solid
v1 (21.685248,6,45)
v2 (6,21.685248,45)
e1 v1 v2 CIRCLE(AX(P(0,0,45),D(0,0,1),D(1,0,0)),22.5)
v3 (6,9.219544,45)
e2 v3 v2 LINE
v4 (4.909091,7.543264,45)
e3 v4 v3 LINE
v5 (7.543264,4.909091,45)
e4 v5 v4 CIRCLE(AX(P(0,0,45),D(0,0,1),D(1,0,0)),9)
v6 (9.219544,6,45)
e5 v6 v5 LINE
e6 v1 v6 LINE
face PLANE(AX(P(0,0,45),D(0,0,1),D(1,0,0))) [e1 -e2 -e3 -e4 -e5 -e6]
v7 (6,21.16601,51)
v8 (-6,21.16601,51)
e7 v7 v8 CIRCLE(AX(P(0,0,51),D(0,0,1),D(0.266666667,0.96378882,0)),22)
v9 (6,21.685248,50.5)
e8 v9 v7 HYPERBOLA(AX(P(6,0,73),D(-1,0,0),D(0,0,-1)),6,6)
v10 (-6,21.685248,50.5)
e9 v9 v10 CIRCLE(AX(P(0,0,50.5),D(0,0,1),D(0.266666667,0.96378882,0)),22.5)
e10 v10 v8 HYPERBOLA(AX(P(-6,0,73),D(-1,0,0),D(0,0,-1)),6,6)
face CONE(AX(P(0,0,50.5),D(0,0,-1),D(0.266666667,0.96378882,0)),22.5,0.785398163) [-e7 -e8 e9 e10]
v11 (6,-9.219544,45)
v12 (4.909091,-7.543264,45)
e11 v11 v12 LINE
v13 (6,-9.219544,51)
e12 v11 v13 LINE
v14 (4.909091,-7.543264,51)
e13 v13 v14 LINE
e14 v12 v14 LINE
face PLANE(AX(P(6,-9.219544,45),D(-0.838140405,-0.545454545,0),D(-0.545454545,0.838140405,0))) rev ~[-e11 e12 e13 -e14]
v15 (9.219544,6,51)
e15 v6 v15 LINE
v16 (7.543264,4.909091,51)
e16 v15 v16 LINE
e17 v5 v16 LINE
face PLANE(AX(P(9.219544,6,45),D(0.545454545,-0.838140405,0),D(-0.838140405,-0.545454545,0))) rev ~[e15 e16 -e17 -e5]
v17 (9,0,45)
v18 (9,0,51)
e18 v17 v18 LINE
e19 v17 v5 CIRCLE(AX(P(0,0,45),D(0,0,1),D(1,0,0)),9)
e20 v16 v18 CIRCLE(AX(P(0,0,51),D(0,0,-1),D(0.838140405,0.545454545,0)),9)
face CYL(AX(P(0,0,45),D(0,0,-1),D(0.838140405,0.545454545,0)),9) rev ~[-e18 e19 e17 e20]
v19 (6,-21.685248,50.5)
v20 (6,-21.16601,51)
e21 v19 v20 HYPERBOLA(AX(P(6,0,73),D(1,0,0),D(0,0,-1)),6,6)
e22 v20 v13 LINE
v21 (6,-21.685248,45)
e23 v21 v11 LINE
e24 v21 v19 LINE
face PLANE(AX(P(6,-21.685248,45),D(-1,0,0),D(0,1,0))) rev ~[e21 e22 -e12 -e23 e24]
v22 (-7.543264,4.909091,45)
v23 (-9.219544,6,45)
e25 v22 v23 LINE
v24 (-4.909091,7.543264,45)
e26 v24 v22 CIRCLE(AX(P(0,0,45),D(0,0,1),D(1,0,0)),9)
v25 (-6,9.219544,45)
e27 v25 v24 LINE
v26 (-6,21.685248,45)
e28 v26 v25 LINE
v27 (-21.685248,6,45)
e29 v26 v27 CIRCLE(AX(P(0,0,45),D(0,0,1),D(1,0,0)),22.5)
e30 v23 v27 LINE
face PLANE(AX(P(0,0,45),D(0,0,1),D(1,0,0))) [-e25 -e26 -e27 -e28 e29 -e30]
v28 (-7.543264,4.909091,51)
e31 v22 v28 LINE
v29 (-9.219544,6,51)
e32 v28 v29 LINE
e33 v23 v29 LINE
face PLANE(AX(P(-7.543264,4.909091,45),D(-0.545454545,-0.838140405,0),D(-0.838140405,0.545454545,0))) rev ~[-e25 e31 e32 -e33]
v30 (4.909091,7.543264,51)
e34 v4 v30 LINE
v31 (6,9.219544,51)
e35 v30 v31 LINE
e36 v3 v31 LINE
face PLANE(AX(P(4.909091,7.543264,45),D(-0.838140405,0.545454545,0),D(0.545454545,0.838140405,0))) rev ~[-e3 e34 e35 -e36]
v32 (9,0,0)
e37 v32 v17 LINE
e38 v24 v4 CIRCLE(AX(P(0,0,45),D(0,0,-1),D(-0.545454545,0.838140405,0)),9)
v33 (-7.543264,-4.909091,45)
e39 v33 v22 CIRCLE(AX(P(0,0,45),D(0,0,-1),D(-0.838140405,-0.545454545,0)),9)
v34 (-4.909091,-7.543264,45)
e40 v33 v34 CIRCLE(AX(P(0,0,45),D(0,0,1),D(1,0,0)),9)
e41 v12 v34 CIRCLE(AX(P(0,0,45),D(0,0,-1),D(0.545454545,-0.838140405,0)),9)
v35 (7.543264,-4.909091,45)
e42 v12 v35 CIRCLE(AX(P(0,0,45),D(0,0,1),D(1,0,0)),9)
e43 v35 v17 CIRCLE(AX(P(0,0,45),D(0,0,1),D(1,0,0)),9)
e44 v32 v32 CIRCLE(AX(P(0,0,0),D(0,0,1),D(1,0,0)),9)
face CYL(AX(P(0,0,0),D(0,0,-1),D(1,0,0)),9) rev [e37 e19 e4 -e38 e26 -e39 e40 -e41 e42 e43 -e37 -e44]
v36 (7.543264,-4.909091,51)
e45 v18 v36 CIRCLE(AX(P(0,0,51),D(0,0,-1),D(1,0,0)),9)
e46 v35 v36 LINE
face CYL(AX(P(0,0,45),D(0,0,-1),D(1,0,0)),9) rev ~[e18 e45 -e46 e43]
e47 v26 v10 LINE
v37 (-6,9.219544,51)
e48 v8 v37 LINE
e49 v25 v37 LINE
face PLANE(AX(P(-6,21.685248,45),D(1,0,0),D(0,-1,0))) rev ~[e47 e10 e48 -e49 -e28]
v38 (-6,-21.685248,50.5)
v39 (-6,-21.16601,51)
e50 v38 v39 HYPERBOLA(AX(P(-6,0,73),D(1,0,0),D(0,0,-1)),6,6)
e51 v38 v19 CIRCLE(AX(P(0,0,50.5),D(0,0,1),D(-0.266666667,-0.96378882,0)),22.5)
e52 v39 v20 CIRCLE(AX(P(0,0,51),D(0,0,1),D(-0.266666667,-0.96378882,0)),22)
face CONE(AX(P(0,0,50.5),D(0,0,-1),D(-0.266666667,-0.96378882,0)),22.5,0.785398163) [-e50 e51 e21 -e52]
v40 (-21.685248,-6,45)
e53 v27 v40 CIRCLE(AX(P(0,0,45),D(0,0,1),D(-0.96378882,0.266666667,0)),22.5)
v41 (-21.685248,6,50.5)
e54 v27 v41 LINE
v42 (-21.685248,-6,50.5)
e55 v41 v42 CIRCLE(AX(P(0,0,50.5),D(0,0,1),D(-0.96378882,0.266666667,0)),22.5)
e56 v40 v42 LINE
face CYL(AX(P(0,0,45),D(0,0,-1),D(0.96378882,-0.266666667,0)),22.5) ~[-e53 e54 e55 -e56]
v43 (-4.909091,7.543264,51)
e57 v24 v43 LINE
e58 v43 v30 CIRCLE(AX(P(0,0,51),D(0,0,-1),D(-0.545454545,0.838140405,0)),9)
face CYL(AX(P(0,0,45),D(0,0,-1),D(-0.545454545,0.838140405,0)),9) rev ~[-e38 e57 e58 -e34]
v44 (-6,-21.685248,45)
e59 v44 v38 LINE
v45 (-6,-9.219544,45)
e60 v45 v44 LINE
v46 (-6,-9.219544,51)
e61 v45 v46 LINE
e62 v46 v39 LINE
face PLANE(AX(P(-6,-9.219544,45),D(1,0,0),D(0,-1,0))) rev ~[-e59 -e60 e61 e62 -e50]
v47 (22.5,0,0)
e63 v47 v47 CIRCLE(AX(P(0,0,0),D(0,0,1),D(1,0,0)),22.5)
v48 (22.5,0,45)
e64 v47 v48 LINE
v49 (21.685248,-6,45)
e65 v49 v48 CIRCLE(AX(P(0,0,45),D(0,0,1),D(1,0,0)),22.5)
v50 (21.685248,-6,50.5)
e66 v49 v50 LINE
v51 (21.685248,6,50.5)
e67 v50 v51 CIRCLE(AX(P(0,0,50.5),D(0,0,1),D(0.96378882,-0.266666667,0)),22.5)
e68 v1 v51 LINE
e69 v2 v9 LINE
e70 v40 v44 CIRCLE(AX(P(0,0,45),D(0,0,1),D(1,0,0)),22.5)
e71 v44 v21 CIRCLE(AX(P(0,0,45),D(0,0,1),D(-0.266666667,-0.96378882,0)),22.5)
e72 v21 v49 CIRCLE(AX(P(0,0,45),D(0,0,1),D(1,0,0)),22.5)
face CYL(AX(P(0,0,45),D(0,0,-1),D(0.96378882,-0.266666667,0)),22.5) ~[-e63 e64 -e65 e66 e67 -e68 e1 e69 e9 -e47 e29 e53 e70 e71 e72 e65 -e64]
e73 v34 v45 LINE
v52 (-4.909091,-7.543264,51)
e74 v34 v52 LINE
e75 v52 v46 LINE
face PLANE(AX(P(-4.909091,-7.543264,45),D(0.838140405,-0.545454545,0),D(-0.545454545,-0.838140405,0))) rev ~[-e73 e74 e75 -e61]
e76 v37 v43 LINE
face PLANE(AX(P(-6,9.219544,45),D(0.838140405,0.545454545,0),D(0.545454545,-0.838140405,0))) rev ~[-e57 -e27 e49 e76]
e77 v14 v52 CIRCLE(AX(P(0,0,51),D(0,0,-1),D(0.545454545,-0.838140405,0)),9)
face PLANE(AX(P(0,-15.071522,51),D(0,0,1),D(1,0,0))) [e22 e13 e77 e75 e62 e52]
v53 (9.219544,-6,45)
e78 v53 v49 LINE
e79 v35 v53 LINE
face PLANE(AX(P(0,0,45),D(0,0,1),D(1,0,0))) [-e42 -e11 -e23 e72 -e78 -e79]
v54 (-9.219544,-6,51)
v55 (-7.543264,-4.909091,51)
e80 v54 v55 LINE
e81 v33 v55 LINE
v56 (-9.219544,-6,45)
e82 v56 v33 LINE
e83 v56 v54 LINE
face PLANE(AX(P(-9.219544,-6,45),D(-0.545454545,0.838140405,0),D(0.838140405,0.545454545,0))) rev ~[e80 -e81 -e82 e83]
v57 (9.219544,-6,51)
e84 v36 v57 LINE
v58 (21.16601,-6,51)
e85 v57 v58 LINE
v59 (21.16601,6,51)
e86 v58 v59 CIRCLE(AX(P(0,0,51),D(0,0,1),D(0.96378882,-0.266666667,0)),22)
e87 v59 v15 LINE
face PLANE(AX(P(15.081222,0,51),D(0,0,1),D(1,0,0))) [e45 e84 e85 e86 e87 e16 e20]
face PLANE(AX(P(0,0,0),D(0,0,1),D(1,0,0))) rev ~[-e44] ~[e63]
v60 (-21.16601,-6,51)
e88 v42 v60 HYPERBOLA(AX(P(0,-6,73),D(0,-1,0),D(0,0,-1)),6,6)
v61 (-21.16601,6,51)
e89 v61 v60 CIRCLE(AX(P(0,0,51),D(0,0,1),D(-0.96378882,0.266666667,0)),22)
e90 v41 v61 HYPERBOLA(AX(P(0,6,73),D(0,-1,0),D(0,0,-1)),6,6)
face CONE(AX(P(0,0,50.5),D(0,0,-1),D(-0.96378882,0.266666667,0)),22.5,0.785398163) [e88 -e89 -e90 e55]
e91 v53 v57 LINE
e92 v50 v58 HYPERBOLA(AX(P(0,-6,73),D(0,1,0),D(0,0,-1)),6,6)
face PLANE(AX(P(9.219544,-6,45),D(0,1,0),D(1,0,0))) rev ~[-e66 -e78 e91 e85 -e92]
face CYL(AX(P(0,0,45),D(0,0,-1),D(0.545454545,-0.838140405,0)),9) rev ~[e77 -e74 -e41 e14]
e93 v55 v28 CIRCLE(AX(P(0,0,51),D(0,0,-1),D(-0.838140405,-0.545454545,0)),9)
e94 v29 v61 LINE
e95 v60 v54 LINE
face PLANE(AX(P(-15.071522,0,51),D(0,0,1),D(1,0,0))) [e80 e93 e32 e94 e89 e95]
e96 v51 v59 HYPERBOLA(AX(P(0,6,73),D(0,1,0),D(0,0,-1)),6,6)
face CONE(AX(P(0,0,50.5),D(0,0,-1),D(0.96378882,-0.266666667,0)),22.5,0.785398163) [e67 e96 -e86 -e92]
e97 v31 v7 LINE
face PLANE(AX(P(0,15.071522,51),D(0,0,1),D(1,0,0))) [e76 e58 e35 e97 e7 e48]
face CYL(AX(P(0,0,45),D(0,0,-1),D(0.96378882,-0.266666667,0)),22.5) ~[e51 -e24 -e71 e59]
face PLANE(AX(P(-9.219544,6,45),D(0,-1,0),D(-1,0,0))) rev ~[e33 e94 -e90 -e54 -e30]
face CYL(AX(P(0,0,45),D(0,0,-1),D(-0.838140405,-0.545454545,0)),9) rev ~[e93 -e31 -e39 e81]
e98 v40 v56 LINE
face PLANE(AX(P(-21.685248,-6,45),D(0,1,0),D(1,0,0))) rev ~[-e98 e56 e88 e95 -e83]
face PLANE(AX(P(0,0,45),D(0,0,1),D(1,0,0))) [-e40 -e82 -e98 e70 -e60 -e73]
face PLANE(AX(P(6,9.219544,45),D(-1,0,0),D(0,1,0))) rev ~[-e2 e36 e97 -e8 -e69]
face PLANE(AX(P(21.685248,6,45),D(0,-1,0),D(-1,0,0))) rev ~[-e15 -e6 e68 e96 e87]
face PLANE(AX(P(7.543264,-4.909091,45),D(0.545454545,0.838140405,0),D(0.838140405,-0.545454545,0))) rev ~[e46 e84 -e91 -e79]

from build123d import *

# Parameters (mm, degrees)
F0_R     = 22.5
F0_R_2   = 9
F1_DEPTH = 45
F3_DEPTH = 6
F4_SIZE  = 0.5


# Not quite as in the source:
# - after a boolean that leaves OpenCascade's solid faulty, fix() repairs it


with BuildPart() as f1:
    # F0 (on Top) → F1 (new body)
    with BuildSketch(Plane.XY):
        Circle(F0_R)
        Circle(F0_R_2, mode=Mode.SUBTRACT)
    extrude(amount=F1_DEPTH)

    # F2 (on face) → F3 (join)
    with BuildSketch(Plane.XY.offset(45)):
        with BuildLine():
            ThreePointArc((-21.6852484422, 6), (-22.5, 0), (-21.6852484422, -6))
            Line((-21.6852484422, -6), (-9.2195444573, -6))
            Line((-9.2195444573, -6), (-7.5432636469, -4.9090909091))
            ThreePointArc((-7.5432636469, -4.9090909091), (-9, 0), (-7.5432636469, 4.9090909091))
            Line((-7.5432636469, 4.9090909091), (-9.2195444573, 6))
            Line((-9.2195444573, 6), (-21.6852484422, 6))
        make_face()
        with BuildLine():
            ThreePointArc((6, 21.6852484422), (0, 22.5), (-6, 21.6852484422))
            Line((-6, 21.6852484422), (-6, 9.2195444573))
            Line((-6, 9.2195444573), (-4.9090909091, 7.5432636469))
            ThreePointArc((-4.9090909091, 7.5432636469), (0, 9), (4.9090909091, 7.5432636469))
            Line((4.9090909091, 7.5432636469), (6, 9.2195444573))
            Line((6, 9.2195444573), (6, 21.6852484422))
        make_face()
        with BuildLine():
            Line((9.2195444573, -6), (21.6852484422, -6))
            ThreePointArc((21.6852484422, -6), (22.2953816961, -3.0275328281), (22.5, 0))
            ThreePointArc((22.5, 0), (22.2953816961, 3.0275328281), (21.6852484422, 6))
            Line((21.6852484422, 6), (9.2195444573, 6))
            Line((9.2195444573, 6), (7.5432636469, 4.9090909091))
            ThreePointArc((7.5432636469, 4.9090909091), (8.6281334257, 2.5603346635), (9, 0))
            ThreePointArc((9, 0), (8.6281334257, -2.5603346635), (7.5432636469, -4.9090909091))
            Line((7.5432636469, -4.9090909091), (9.2195444573, -6))
        make_face()
        with BuildLine():
            Line((-6, -9.2195444573), (-6, -21.6852484422))
            ThreePointArc((-6, -21.6852484422), (0, -22.5), (6, -21.6852484422))
            Line((6, -21.6852484422), (6, -9.2195444573))
            Line((6, -9.2195444573), (4.9090909091, -7.5432636469))
            ThreePointArc((4.9090909091, -7.5432636469), (0, -9), (-4.9090909091, -7.5432636469))
            Line((-4.9090909091, -7.5432636469), (-6, -9.2195444573))
        make_face()
    extrude(amount=F3_DEPTH)

    add(f1.part.fix(), mode=Mode.REPLACE)

    # F4
    f4_edges = [f1.edges().sort_by_distance(p)[0] for p in [
        (-22.5, 0, 51),
        (0, 22.5, 51),
        (22.5, 0, 51),
        (0, -22.5, 51),
    ]]
    chamfer(f4_edges, length=F4_SIZE)


solid = f1.part
